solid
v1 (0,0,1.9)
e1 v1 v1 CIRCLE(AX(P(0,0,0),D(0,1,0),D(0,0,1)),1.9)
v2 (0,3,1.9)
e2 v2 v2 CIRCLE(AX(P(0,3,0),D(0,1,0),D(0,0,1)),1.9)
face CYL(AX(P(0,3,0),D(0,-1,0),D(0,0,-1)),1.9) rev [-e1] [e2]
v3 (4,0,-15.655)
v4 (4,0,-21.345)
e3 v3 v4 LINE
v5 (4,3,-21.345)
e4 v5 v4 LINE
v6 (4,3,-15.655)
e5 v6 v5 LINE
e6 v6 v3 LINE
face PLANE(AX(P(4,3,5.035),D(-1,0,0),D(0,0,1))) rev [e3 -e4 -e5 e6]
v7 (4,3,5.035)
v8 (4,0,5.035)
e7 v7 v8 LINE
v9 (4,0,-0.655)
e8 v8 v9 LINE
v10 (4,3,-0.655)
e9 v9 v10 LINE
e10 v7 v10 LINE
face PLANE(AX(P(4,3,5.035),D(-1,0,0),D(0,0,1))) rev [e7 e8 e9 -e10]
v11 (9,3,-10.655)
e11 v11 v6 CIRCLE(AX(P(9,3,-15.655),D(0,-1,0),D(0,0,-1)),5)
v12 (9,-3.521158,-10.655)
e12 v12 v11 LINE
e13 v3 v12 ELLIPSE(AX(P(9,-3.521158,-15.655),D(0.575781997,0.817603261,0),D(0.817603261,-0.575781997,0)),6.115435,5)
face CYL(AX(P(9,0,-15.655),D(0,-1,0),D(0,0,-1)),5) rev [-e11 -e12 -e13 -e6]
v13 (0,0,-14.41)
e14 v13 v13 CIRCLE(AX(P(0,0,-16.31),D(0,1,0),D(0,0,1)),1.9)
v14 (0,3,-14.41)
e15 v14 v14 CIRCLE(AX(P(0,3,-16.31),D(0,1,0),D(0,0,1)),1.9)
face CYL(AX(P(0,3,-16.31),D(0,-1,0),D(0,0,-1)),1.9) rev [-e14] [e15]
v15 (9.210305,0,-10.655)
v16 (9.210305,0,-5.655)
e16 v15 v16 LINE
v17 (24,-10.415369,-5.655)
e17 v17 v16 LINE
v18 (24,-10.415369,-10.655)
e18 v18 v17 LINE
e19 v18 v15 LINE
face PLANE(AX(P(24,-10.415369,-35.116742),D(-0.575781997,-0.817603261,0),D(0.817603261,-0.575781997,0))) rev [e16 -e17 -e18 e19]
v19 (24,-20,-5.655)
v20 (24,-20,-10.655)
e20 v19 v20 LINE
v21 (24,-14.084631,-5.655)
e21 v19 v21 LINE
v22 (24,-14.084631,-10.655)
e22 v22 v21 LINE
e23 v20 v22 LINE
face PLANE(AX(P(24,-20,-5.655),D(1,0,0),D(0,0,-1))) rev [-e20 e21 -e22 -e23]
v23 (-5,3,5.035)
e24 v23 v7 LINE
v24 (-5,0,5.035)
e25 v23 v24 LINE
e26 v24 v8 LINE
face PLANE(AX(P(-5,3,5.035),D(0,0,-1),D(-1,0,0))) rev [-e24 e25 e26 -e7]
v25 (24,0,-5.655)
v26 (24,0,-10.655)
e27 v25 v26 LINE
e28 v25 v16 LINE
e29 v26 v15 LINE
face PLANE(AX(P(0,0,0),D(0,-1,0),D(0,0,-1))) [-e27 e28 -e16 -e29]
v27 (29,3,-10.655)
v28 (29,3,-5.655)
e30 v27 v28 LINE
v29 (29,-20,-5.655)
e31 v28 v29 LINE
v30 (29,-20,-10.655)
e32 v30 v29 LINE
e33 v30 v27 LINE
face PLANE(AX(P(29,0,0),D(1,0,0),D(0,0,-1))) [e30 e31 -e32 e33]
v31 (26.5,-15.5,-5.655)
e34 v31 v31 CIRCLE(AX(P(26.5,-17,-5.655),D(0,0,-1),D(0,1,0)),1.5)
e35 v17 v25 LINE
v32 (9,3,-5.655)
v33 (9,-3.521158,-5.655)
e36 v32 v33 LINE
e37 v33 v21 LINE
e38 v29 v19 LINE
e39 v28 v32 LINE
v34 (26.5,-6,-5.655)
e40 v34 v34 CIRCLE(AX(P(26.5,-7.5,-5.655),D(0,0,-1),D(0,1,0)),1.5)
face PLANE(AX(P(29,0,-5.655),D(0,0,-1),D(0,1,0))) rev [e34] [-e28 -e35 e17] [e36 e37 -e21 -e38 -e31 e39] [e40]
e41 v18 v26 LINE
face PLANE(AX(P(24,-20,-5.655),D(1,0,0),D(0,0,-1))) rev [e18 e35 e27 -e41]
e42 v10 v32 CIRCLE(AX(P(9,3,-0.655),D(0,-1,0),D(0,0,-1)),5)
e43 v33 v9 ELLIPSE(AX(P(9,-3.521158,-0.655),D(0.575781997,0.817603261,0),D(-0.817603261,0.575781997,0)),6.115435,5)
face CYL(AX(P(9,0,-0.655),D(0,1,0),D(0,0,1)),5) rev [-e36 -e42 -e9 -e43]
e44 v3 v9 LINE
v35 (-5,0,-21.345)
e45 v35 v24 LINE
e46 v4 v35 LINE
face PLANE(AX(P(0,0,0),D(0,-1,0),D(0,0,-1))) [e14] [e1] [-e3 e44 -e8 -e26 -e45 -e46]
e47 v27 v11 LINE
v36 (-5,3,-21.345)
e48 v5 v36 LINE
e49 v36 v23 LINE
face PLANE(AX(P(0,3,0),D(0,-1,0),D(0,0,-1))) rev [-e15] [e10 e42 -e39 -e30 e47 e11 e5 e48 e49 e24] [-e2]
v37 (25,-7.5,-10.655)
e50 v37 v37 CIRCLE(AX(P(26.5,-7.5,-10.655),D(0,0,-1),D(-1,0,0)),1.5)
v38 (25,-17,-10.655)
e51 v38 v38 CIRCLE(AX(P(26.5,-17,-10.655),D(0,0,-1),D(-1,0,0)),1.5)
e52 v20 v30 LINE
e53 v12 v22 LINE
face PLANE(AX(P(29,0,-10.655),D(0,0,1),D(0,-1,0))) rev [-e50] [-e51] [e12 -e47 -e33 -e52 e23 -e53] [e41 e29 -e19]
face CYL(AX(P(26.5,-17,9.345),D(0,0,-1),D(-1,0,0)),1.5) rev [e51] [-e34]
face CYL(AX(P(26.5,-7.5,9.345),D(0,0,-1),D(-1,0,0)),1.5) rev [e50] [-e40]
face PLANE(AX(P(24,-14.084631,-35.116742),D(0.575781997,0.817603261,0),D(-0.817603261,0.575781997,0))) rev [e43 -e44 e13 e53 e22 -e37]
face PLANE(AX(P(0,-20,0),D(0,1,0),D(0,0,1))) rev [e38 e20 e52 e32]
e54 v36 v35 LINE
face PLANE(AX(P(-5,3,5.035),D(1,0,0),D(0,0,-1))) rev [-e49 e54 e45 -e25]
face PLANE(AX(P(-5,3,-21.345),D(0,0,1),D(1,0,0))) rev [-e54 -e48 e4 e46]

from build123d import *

# Parameters (mm, degrees)
SKETCH1_W                       = 9
SKETCH1_H                       = 26.38
SKETCH1_R                       = 1.9
BODY_MOUNT_DEPTH                = 3
SKETCH2_W                       = 5
SKETCH2_H                       = 3
BOSS_EXTRUDE2_DEPTH             = 25
SKETCH3_W                       = 5
SKETCH3_H                       = 5
BOSS_EXTRUDE3_DEPTH             = 20
SKETCH4_R                       = 1.5
CUT_EXTRUDE1_DEPTH              = 20
BOSS_EXTRUDE4_REACH             = 39.616
BOSS_EXTRUDE4_DIRECTION_2_REACH = 39.616
FILLET2_R                       = 5


with BuildPart() as part:
    # Sketch1 → body mount (new body)
    with BuildSketch(Plane(origin=(0, 0, 0), x_dir=(1, 0, 0), z_dir=(0, 1, 0))):
        with Locations((-0.5, 8.155)):
            Rectangle(SKETCH1_W, SKETCH1_H)
        with Locations(Location((0, 0, 0), (0, 0, 270))):
            Circle(SKETCH1_R, mode=Mode.SUBTRACT)
        with Locations(Location((0, 16.31, 0), (0, 0, 270))):
            Circle(SKETCH1_R, mode=Mode.SUBTRACT)
    extrude(amount=BODY_MOUNT_DEPTH)

    # Sketch2 → Boss-Extrude2 (add)
    with BuildSketch(Plane(origin=(4, 0, 0), x_dir=(0, 0, -1), z_dir=(1, 0, 0))):
        with Locations((8.155, 1.5)):
            Rectangle(SKETCH2_W, SKETCH2_H)
    extrude(amount=BOSS_EXTRUDE2_DEPTH)

    # Sketch3 → Boss-Extrude3 (add)
    with BuildSketch(Plane.XZ):
        with Locations((26.5, -8.155)):
            Rectangle(SKETCH3_W, SKETCH3_H)
    extrude(amount=BOSS_EXTRUDE3_DEPTH)

    # Sketch4 → Cut-Extrude1 (cut)
    with BuildSketch(Plane(origin=(0, 0, -10.655), x_dir=(-1, 0, 0), z_dir=(0, 0, -1))):
        with Locations((-26.5, -17)):
            Circle(SKETCH4_R)
        with Locations((-26.5, -7.5)):
            Circle(SKETCH4_R)
    extrude(amount=-CUT_EXTRUDE1_DEPTH, mode=Mode.SUBTRACT)

    # Boss-Extrude4: up to this face of the body (flat: up to its plane)
    boss_extrude4_end = Plane(part.part.faces().sort_by_distance((16.5, 2.660294245, -10.655))[0])
    # Sketch5 → Boss-Extrude4 (add, up to the picked face)
    with BuildSketch(Plane(origin=(0, 0, -8.155), x_dir=(-1, 0, 0), z_dir=(0, 0, -1)), mode=Mode.PRIVATE) as boss_extrude4_sk1:
        Polygon((-24, -10.415369352), (-9.210305315, 0), (-4, 0), (-24, -14.084630648), align=None)
    boss_extrude4_tool1 = split(extrude(boss_extrude4_sk1.sketch, amount=BOSS_EXTRUDE4_REACH, mode=Mode.PRIVATE), bisect_by=boss_extrude4_end, keep=Keep.BOTH, mode=Mode.PRIVATE)
    add(boss_extrude4_tool1.solids().sort_by(Axis((15.237549, -6.170794, -8.155), (0, 0, -1)))[0])

    # Boss-Extrude4 direction 2: up to this face of the body (flat: up to its plane)
    boss_extrude4_direction_2_end = Plane(part.part.faces().sort_by_distance((14, 0.339705755, -5.655))[0])
    # Sketch5 → Boss-Extrude4 direction 2 (add, up to the picked face)
    with BuildSketch(Plane(origin=(0, 0, -8.155), x_dir=(-1, 0, 0), z_dir=(0, 0, -1)), mode=Mode.PRIVATE) as boss_extrude4_direction_2_sk1:
        Polygon((-24, -10.415369352), (-9.210305315, 0), (-4, 0), (-24, -14.084630648), align=None)
    boss_extrude4_direction_2_tool1 = split(extrude(boss_extrude4_direction_2_sk1.sketch, amount=-BOSS_EXTRUDE4_DIRECTION_2_REACH, mode=Mode.PRIVATE), bisect_by=boss_extrude4_direction_2_end, keep=Keep.BOTH, mode=Mode.PRIVATE)
    add(boss_extrude4_direction_2_tool1.solids().sort_by(Axis((15.237549, -6.170794, -8.155), (0, 0, 1)))[0])

    # Fillet2
    # the kernel refuses this fillet: 5 mm, written as the material it adds along each edge
    with BuildSketch(Plane(origin=(4, 3, -10.655), x_dir=(0, 0, -1), z_dir=(0, -1, 0))) as fillet2_piece_1_section:
        with BuildLine():
            CenterArc((FILLET2_R, FILLET2_R), FILLET2_R, 180, 90)
            Line((0, FILLET2_R), (0, 0))
            Line((0, 0), (FILLET2_R, 0))
        make_face()
    fillet2_piece_1 = extrude(amount=3, mode=Mode.PRIVATE)
    fillet2_piece_1 = split(fillet2_piece_1, bisect_by=Plane(origin=(4.050655402, -0.035673131, -11.785736825), z_dir=(0.5757819971310116, 0.8176032606220598, 0)), keep=Keep.TOP, mode=Mode.PRIVATE)
    add(fillet2_piece_1)
    with BuildSketch(Plane(origin=(4, 3, -10.655), x_dir=(0, 0, -1), z_dir=(0, -1, 0))) as fillet2_piece_2_section:
        with BuildLine():
            CenterArc((FILLET2_R, FILLET2_R), FILLET2_R, 180, 90)
            Line((0, FILLET2_R), (0, 0))
            Line((0, 0), (FILLET2_R, 0))
        make_face()
    fillet2_piece_2 = extrude(amount=15.5, mode=Mode.PRIVATE)
    fillet2_piece_2 = split(fillet2_piece_2, bisect_by=Plane(origin=(6.150590259, 0, -11.187362576), z_dir=(0, -1, 0)), keep=Keep.TOP, mode=Mode.PRIVATE)
    fillet2_piece_2 = split(fillet2_piece_2, bisect_by=Plane(origin=(5.79410314, -1.263464003, -11.187362576), z_dir=(0.5757819971310116, 0.8176032606220598, 0)), keep=Keep.TOP, mode=Mode.PRIVATE)
    add(fillet2_piece_2)
    with BuildSketch(Plane(origin=(4, -12.5, -5.655), x_dir=(1, 0, 0), z_dir=(0, 1, 0))) as fillet2_piece_3_section:
        with BuildLine():
            CenterArc((FILLET2_R, -FILLET2_R), FILLET2_R, 90, 90)
            Line((0, -FILLET2_R), (0, 0))
            Line((0, 0), (FILLET2_R, 0))
        make_face()
    fillet2_piece_3 = extrude(amount=15.5, mode=Mode.PRIVATE)
    fillet2_piece_3 = split(fillet2_piece_3, bisect_by=Plane(origin=(5.79410314, -1.263464003, -5.122637424), z_dir=(0.5757819971310116, 0.8176032606220598, 0)), keep=Keep.TOP, mode=Mode.PRIVATE)
    fillet2_piece_3 = split(fillet2_piece_3, bisect_by=Plane(origin=(6.150590259, 0, -5.122637424), z_dir=(0, -1, 0)), keep=Keep.TOP, mode=Mode.PRIVATE)
    add(fillet2_piece_3)
    with BuildSketch(Plane(origin=(4, 0, -5.655), x_dir=(1, 0, 0), z_dir=(0, 1, 0))) as fillet2_piece_4_section:
        with BuildLine():
            CenterArc((FILLET2_R, -FILLET2_R), FILLET2_R, 90, 90)
            Line((0, -FILLET2_R), (0, 0))
            Line((0, 0), (FILLET2_R, 0))
        make_face()
    fillet2_piece_4 = extrude(amount=3, mode=Mode.PRIVATE)
    fillet2_piece_4 = split(fillet2_piece_4, bisect_by=Plane(origin=(4.050655402, -0.035673131, -4.524263175), z_dir=(0.5757819971310116, 0.8176032606220598, 0)), keep=Keep.TOP, mode=Mode.PRIVATE)
    add(fillet2_piece_4)


solid = part.part
